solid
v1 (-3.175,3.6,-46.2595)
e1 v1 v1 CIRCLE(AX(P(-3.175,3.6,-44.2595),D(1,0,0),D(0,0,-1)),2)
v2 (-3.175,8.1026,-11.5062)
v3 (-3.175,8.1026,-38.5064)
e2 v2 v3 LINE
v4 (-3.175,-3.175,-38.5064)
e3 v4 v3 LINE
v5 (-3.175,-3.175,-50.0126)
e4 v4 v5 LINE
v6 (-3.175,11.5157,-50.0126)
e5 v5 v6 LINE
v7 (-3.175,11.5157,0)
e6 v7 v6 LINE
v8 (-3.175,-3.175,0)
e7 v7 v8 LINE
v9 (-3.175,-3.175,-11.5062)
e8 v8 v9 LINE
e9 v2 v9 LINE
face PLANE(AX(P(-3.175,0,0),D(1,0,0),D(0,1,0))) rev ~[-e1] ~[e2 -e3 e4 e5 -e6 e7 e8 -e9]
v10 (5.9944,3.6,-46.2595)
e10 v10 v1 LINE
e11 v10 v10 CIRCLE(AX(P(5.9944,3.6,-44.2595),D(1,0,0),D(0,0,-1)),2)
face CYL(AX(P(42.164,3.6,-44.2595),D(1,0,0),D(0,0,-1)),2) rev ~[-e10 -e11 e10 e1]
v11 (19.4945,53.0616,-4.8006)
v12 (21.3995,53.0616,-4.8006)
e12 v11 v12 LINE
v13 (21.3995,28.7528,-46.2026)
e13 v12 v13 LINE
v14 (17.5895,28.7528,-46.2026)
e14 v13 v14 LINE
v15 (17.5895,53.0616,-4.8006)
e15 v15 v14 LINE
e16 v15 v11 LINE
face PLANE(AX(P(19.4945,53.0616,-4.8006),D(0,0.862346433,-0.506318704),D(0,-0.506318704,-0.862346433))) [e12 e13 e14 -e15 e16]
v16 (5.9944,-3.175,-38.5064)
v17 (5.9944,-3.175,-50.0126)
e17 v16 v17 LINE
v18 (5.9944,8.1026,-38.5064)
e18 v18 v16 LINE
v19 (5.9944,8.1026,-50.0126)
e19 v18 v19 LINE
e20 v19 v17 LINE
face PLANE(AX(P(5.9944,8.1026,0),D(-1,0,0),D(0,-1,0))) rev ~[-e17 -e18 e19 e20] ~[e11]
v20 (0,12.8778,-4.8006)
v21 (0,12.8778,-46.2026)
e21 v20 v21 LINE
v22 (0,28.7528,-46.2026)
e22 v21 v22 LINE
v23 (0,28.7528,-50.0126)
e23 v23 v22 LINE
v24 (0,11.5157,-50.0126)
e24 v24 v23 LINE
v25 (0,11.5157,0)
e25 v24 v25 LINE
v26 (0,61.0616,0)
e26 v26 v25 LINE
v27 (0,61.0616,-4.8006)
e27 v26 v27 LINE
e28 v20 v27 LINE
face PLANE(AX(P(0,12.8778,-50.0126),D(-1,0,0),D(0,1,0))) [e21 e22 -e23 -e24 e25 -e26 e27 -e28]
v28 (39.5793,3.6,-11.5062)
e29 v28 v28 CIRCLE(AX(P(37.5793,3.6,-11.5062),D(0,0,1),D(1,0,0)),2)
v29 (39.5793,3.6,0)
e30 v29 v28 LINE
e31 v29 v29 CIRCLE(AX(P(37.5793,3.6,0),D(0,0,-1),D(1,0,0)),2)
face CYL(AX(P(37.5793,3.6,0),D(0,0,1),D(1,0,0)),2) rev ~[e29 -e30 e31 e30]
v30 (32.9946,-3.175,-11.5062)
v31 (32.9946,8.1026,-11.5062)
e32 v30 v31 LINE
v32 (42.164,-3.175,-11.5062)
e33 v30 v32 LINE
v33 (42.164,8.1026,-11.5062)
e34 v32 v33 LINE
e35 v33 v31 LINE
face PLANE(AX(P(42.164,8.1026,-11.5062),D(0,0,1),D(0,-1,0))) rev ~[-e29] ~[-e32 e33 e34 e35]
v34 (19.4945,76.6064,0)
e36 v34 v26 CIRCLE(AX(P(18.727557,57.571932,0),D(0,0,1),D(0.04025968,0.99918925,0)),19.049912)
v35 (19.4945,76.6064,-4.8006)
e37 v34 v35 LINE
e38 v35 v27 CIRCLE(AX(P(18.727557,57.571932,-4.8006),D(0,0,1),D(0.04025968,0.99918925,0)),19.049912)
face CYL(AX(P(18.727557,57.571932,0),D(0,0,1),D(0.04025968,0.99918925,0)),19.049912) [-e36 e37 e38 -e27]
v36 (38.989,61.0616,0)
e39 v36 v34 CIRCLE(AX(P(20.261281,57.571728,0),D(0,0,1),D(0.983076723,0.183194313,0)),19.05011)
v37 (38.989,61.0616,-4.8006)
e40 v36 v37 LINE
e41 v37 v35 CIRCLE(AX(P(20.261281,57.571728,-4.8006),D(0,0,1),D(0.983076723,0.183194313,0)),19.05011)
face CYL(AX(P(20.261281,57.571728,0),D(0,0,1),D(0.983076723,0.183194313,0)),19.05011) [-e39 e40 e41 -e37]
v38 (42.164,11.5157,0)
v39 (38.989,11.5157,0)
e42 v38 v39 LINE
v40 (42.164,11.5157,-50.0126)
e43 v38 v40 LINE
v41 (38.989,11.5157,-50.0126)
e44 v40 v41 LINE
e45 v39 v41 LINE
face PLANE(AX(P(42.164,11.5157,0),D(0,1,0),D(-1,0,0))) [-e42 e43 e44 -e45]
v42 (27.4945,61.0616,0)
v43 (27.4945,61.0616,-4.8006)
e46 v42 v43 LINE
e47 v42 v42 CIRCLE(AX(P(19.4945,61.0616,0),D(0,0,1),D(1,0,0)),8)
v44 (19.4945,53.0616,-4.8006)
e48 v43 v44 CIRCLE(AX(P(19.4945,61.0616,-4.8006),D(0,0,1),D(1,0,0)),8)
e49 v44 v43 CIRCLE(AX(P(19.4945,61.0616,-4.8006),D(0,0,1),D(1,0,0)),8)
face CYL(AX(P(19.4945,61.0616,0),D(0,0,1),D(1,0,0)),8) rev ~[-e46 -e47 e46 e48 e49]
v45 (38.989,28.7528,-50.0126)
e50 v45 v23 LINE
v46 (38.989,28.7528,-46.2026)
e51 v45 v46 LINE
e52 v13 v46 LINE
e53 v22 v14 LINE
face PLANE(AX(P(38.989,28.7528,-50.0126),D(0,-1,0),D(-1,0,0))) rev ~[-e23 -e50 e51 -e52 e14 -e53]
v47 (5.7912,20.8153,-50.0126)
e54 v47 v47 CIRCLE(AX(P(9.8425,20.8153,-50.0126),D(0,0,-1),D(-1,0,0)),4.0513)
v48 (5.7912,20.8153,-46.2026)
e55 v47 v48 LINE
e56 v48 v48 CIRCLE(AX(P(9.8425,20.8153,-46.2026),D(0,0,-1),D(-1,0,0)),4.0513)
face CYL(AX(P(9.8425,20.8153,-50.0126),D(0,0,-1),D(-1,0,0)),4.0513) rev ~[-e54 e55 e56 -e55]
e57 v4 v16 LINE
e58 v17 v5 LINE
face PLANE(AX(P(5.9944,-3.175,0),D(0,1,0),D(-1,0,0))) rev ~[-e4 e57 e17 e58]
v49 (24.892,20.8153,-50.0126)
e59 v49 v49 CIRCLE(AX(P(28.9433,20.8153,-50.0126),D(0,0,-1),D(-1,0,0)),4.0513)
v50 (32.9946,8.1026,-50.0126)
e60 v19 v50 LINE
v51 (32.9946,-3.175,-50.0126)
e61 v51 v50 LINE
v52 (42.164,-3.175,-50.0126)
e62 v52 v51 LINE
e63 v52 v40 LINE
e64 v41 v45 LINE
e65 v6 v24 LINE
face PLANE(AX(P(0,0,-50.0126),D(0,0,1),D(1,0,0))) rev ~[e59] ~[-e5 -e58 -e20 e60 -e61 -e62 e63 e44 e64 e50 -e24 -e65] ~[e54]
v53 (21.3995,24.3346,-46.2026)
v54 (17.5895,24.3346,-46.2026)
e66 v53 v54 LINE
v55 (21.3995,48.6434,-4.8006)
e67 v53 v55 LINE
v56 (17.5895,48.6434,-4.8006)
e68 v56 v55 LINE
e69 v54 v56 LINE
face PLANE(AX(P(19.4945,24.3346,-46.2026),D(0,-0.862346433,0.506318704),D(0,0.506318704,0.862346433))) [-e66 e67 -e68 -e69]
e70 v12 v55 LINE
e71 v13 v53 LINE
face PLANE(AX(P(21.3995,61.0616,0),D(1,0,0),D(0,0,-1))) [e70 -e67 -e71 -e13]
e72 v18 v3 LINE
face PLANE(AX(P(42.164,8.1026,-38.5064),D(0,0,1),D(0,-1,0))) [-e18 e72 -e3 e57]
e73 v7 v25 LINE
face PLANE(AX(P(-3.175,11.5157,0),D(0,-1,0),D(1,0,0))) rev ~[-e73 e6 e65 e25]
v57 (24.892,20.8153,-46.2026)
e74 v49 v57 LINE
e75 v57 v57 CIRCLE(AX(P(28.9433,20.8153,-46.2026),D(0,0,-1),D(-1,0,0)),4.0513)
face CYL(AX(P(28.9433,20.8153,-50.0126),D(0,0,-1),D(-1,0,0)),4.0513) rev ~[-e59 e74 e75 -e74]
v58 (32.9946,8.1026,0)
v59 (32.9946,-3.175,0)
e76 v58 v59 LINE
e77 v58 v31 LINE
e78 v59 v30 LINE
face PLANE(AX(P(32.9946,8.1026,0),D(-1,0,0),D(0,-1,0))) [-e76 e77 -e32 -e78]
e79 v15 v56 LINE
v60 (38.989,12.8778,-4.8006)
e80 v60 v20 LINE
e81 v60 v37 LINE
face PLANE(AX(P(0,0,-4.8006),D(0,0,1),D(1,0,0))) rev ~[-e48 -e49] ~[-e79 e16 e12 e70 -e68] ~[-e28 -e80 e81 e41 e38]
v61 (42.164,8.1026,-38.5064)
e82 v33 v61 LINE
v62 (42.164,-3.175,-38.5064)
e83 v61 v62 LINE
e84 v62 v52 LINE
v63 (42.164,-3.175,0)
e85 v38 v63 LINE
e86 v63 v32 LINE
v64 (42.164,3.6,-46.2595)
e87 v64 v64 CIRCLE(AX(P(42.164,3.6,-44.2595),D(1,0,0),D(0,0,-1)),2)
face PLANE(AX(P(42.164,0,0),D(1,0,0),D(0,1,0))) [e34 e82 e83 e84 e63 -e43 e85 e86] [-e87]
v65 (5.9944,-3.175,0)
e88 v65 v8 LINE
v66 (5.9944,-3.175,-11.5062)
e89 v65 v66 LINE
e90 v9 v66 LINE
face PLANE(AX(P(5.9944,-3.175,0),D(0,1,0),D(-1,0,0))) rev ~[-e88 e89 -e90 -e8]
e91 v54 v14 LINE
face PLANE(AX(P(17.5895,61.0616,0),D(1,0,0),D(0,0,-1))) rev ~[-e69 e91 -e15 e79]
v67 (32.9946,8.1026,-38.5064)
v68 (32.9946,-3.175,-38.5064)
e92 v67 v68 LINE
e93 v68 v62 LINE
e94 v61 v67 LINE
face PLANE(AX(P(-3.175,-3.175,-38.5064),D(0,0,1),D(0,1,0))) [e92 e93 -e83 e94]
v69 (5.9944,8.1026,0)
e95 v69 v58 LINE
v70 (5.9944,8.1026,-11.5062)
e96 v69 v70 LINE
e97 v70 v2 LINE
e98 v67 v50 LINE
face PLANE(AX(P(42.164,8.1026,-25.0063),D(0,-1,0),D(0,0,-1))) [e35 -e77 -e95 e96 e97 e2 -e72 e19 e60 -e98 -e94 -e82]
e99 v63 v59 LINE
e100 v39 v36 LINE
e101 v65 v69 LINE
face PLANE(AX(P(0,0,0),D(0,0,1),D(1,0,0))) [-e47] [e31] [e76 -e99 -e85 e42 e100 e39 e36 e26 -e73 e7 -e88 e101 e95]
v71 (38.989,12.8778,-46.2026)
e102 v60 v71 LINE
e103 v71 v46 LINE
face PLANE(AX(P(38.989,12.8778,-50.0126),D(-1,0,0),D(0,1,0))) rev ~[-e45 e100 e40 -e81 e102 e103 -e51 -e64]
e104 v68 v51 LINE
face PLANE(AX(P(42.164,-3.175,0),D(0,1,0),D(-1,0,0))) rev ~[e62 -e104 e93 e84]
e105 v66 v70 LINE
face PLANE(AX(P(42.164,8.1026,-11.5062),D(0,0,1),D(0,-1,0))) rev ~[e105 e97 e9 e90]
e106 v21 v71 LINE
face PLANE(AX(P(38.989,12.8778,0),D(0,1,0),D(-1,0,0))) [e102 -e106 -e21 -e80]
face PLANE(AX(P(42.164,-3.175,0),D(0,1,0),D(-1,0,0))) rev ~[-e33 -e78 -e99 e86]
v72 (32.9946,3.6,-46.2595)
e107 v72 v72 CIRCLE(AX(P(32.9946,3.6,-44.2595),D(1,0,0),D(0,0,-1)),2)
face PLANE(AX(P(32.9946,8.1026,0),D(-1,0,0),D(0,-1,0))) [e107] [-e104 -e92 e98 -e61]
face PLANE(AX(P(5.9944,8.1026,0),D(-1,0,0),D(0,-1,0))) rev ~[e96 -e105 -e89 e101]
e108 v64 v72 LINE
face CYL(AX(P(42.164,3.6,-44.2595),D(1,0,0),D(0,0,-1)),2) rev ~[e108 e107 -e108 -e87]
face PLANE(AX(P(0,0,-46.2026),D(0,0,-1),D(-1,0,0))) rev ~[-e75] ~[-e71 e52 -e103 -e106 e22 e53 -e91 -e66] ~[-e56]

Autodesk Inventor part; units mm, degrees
ref_plane "YZ Plane" through (0, 0, 0) normal (1, 0, 0) x (0, 1, 0)
ref_plane "XZ Plane" through (0, 0, 0) normal (0, 1, 0) x (-1, 0, 0)
sketch "Sketch1" plane through (0, 0, 0) normal (0, 0, 1) x (1, 0, 0)
  line L0 (0, 0) -> (38.989, 0)
  line L1 (0, 8.1026) -> (0, 61.0616)
  line L2 (38.989, 8.1026) -> (38.989, 61.0616)
  arc A0 (19.4945, 76.6064) -> (0, 61.0616) centre (18.7276, 57.5718) ccw
  arc A1 (38.989, 61.0616) -> (19.4945, 76.6064) centre (20.2614, 57.5718) ccw
  line L3 (0, 8.1026) -> (38.989, 8.1026)
  line L4 (0, 61.0616) -> (38.989, 61.0616)
  dimension "d3" = 19.05
  dimension "d4" = 19.05
extrude "Extrusion1" add sketch "Sketch1" against normal blind 4.8006
sketch "Sketch2" plane through (0, 0, 0) normal (0, 0, 1) x (1, 0, 0)
  line L0 (38.989, 8.1026) -> (0, 8.1026) projected
  line L1 (38.989, 61.0616) -> (38.989, 8.1026) projected
  line L2 (5.9944, 8.1026) -> (32.9946, 8.1026)
  line L3 (38.989, 11.5157) -> (38.989, 12.8778)
  line L4 (38.989, 12.8778) -> (0, 12.8778)
  line L5 (0, 12.8778) -> (0, 11.5157)
  line L6 (5.9944, 8.1026) -> (5.9944, 0)
  line L7 (5.9944, 0) -> (0, 0)
  line L8 (32.9946, 8.1026) -> (32.9946, 0)
  line L9 (32.9946, 0) -> (38.989, 0)
  line L10 (38.989, 0) -> (42.164, 0)
  line L11 (42.164, 0) -> (42.164, 11.5157)
  line L12 (42.164, 11.5157) -> (38.989, 11.5157)
  line L13 (38.989, 12.8778) -> (38.989, 11.5157)
  line L14 (0, 0) -> (-3.175, 0)
  line L15 (-3.175, 0) -> (-3.175, 11.5157)
  line L16 (-3.175, 11.5157) -> (0, 11.5157)
extrude "Extrusion2" add sketch "Sketch2" against normal blind 50.0126 contours L0 L6 L7 L14 L15 L16 L5 L4 L1
sketch "Sketch3" plane through (0, 0, -50.0126) normal (0, 0, -1) x (-1, 0, 0)
  line L0 (-38.989, 12.8778) -> (0, 12.8778) projected
  line L1 (-4.4958, 12.8778) -> (-34.4932, 12.8778)
  line L2 (-34.4932, 28.7528) -> (-4.4958, 28.7528)
  line L3 (-38.989, 8.1026) -> (-38.989, 61.0616) projected
  circle A0 centre (-28.9433, 20.8153) radius 4.0513
  circle A1 centre (-9.8425, 20.8153) radius 4.0513
  line L4 (-34.4932, 12.8778) -> (-38.989, 12.8778)
  line L5 (-38.989, 12.8778) -> (-38.989, 28.7528)
  line L6 (-38.989, 28.7528) -> (-34.4932, 28.7528)
  line L7 (-4.4958, 28.7528) -> (0, 28.7528)
  line L8 (0, 12.8778) -> (0, 61.0616) projected
  line L9 (0, 28.7528) -> (0, 12.8778)
  line L10 (0, 12.8778) -> (-4.4958, 12.8778)
  point P0 (0, 0)
  point P1 (-38.989, 0)
  dimension "d17" = 8.1026
  dimension "d19" = 8.1026
extrude "Extrusion3" add sketch "Sketch3" against normal blind 3.81
ref_plane "Work Plane1" through (19.4945, 61.0616, 0) normal (1, 0, 0) x (0, 0, -1)
sketch "Sketch6" plane through (0, 0, 0) normal (0, 0, 1) x (1, 0, 0)
  line L0 (0, 61.0616) -> (0, 0) projected
  arc A0 (38.989, 61.0616) -> (19.4945, 76.6064) centre (20.2614, 57.5718) ccw projected
  circle A1 centre (19.4945, 61.0616) radius 8
  dimension "d22" = 16
extrude "Extrusion4" cut sketch "Sketch6" against normal blind 5.3975
sketch "Sketch7" plane through (19.4945, 61.0616, 0) normal (1, 0, 0) x (0, 0, -1)
  line L0 (0, -8) -> (4.8006, -8) projected
  line L1 (4.8006, -8) -> (46.2026, -32.3088)
  line L2 (46.2026, -32.3088) -> (46.2026, -48.1838)
  line L3 (4.8006, 0) -> (4.8006, -48.1838) projected
  line L4 (46.2026, -44.2976) -> (46.2026, -36.195) projected
  line L5 (46.2026, -36.727) -> (4.8006, -12.4182)
  point P0 (0, -61.0616)
extrude "Extrusion5" add sketch "Sketch7" along normal mid plane 3.81
sketch "Sketch11" plane through (38.989, 61.0616, 0) normal (1, 0, 0) x (0, 0, -1)
  line L0 (0, -61.0616) -> (50.0126, -61.0616) projected
  line L1 (50.0126, -48.1838) -> (50.0126, -61.0616) projected
  circle A0 centre (25.0063, -57.2836) radius 2
  dimension "d54" = 4
extrude "Extrusion8" cut sketch "Sketch11" against normal blind 7.9375
extrude "Extrusion9" add sketch "Sketch2" against normal up to surface (50.0126 mm away) contours L1 L12 L11 L10 L9 L8 L0
sketch "Sketch12" plane through (42.164, 0, 0) normal (1, 0, 0) x (0, 0, -1)
  line L0 (0, 0) -> (50.0126, 0) projected
  line L1 (25.0063, 8.1026) -> (11.5062, 8.1026)
  line L2 (11.5062, 8.1026) -> (11.5062, 0)
  line L3 (25.0063, 8.1026) -> (38.5064, 8.1026)
  line L4 (0, 8.1026) -> (50.0126, 8.1026) projected
  line L5 (38.5064, 8.1026) -> (38.5064, 0)
  line L6 (11.5062, 0) -> (38.5064, 0)
  dimension "d63" = 13.5001
  dimension "d64" = 13.5001
extrude "Extrusion10" cut sketch "Sketch12" against normal up to surface (45.339 mm away)
sketch "Sketch13" plane through (0, 0, 0) normal (0, 0, 1) x (1, 0, 0)
  circle A0 centre (37.5793, 3.6) radius 2
  line L0 (32.9946, 0) -> (42.164, 0) projected
  line L1 (37.5793, 0) -> (37.5793, 1.6)
  line L2 (37.5793, 0) -> (39.1793, 0) construction
  point P0 (0, 0)
  dimension "d67" = 4
  dimension "d68" = 1.6
  dimension "d69" = 90
extrude "Extrusion11" cut sketch "Sketch13" against normal up to surface (11.5062 mm away)
sketch "Sketch14" plane through (42.164, 0, 0) normal (1, 0, 0) x (0, 0, -1)
  circle A0 centre (44.2595, 3.6) radius 2
  point P0 (0, 0)
  point P1 (38.5064, 0)
  point P2 (50.0126, 0)
  dimension "d73" = 4
extrude "Extrusion12" cut sketch "Sketch14" against normal up to surface (45.339 mm away)
sketch "Sketch15" plane through (0, 0, 0) normal (0, 0, 1) x (1, 0, 0)
  line L0 (-3.175, 0) -> (5.9944, 0) projected
  line L1 (-3.175, 0) -> (5.9944, 0)
  line L2 (5.9944, 0) -> (5.9944, -3.175)
  line L3 (5.9944, -3.175) -> (-3.175, -3.175)
  line L4 (-3.175, -3.175) -> (-3.175, 0)
  line L5 (32.9946, 0) -> (42.164, 0) projected
  line L6 (32.9946, 0) -> (42.164, 0)
  line L7 (42.164, 0) -> (42.164, -3.175)
  line L8 (42.164, -3.175) -> (32.9946, -3.175)
  line L9 (32.9946, -3.175) -> (32.9946, 0)
  point P0 (0, 0)
  dimension "d76" = 3.175
  dimension "d77" = 3.175
extrude "Extrusion13" add sketch "Sketch15" against normal up to surface (50.0126 mm away)
sketch "Sketch16" plane through (-3.175, 11.5157, -50.0126) normal (-1, 0, 0) x (0, 0, 1)
  line L0 (38.5064, -11.5157) -> (11.5062, -11.5157) projected
  line L1 (38.5064, -11.5157) -> (38.5064, -14.6907)
  line L2 (50.0126, -14.6907) -> (0, -14.6907) projected
  line L3 (11.5062, -11.5157) -> (38.5064, -11.5157)
  line L4 (38.5064, -11.5157) -> (38.5064, -14.6907)
  line L5 (38.5064, -14.6907) -> (11.5062, -14.6907)
  line L6 (11.5062, -14.6907) -> (11.5062, -11.5157)
  point P0 (50.0126, -11.5157)
extrude "Extrusion14" cut sketch "Sketch16" against normal up to surface (45.339 mm away)
properties part number "Transmitter + Reciever"
